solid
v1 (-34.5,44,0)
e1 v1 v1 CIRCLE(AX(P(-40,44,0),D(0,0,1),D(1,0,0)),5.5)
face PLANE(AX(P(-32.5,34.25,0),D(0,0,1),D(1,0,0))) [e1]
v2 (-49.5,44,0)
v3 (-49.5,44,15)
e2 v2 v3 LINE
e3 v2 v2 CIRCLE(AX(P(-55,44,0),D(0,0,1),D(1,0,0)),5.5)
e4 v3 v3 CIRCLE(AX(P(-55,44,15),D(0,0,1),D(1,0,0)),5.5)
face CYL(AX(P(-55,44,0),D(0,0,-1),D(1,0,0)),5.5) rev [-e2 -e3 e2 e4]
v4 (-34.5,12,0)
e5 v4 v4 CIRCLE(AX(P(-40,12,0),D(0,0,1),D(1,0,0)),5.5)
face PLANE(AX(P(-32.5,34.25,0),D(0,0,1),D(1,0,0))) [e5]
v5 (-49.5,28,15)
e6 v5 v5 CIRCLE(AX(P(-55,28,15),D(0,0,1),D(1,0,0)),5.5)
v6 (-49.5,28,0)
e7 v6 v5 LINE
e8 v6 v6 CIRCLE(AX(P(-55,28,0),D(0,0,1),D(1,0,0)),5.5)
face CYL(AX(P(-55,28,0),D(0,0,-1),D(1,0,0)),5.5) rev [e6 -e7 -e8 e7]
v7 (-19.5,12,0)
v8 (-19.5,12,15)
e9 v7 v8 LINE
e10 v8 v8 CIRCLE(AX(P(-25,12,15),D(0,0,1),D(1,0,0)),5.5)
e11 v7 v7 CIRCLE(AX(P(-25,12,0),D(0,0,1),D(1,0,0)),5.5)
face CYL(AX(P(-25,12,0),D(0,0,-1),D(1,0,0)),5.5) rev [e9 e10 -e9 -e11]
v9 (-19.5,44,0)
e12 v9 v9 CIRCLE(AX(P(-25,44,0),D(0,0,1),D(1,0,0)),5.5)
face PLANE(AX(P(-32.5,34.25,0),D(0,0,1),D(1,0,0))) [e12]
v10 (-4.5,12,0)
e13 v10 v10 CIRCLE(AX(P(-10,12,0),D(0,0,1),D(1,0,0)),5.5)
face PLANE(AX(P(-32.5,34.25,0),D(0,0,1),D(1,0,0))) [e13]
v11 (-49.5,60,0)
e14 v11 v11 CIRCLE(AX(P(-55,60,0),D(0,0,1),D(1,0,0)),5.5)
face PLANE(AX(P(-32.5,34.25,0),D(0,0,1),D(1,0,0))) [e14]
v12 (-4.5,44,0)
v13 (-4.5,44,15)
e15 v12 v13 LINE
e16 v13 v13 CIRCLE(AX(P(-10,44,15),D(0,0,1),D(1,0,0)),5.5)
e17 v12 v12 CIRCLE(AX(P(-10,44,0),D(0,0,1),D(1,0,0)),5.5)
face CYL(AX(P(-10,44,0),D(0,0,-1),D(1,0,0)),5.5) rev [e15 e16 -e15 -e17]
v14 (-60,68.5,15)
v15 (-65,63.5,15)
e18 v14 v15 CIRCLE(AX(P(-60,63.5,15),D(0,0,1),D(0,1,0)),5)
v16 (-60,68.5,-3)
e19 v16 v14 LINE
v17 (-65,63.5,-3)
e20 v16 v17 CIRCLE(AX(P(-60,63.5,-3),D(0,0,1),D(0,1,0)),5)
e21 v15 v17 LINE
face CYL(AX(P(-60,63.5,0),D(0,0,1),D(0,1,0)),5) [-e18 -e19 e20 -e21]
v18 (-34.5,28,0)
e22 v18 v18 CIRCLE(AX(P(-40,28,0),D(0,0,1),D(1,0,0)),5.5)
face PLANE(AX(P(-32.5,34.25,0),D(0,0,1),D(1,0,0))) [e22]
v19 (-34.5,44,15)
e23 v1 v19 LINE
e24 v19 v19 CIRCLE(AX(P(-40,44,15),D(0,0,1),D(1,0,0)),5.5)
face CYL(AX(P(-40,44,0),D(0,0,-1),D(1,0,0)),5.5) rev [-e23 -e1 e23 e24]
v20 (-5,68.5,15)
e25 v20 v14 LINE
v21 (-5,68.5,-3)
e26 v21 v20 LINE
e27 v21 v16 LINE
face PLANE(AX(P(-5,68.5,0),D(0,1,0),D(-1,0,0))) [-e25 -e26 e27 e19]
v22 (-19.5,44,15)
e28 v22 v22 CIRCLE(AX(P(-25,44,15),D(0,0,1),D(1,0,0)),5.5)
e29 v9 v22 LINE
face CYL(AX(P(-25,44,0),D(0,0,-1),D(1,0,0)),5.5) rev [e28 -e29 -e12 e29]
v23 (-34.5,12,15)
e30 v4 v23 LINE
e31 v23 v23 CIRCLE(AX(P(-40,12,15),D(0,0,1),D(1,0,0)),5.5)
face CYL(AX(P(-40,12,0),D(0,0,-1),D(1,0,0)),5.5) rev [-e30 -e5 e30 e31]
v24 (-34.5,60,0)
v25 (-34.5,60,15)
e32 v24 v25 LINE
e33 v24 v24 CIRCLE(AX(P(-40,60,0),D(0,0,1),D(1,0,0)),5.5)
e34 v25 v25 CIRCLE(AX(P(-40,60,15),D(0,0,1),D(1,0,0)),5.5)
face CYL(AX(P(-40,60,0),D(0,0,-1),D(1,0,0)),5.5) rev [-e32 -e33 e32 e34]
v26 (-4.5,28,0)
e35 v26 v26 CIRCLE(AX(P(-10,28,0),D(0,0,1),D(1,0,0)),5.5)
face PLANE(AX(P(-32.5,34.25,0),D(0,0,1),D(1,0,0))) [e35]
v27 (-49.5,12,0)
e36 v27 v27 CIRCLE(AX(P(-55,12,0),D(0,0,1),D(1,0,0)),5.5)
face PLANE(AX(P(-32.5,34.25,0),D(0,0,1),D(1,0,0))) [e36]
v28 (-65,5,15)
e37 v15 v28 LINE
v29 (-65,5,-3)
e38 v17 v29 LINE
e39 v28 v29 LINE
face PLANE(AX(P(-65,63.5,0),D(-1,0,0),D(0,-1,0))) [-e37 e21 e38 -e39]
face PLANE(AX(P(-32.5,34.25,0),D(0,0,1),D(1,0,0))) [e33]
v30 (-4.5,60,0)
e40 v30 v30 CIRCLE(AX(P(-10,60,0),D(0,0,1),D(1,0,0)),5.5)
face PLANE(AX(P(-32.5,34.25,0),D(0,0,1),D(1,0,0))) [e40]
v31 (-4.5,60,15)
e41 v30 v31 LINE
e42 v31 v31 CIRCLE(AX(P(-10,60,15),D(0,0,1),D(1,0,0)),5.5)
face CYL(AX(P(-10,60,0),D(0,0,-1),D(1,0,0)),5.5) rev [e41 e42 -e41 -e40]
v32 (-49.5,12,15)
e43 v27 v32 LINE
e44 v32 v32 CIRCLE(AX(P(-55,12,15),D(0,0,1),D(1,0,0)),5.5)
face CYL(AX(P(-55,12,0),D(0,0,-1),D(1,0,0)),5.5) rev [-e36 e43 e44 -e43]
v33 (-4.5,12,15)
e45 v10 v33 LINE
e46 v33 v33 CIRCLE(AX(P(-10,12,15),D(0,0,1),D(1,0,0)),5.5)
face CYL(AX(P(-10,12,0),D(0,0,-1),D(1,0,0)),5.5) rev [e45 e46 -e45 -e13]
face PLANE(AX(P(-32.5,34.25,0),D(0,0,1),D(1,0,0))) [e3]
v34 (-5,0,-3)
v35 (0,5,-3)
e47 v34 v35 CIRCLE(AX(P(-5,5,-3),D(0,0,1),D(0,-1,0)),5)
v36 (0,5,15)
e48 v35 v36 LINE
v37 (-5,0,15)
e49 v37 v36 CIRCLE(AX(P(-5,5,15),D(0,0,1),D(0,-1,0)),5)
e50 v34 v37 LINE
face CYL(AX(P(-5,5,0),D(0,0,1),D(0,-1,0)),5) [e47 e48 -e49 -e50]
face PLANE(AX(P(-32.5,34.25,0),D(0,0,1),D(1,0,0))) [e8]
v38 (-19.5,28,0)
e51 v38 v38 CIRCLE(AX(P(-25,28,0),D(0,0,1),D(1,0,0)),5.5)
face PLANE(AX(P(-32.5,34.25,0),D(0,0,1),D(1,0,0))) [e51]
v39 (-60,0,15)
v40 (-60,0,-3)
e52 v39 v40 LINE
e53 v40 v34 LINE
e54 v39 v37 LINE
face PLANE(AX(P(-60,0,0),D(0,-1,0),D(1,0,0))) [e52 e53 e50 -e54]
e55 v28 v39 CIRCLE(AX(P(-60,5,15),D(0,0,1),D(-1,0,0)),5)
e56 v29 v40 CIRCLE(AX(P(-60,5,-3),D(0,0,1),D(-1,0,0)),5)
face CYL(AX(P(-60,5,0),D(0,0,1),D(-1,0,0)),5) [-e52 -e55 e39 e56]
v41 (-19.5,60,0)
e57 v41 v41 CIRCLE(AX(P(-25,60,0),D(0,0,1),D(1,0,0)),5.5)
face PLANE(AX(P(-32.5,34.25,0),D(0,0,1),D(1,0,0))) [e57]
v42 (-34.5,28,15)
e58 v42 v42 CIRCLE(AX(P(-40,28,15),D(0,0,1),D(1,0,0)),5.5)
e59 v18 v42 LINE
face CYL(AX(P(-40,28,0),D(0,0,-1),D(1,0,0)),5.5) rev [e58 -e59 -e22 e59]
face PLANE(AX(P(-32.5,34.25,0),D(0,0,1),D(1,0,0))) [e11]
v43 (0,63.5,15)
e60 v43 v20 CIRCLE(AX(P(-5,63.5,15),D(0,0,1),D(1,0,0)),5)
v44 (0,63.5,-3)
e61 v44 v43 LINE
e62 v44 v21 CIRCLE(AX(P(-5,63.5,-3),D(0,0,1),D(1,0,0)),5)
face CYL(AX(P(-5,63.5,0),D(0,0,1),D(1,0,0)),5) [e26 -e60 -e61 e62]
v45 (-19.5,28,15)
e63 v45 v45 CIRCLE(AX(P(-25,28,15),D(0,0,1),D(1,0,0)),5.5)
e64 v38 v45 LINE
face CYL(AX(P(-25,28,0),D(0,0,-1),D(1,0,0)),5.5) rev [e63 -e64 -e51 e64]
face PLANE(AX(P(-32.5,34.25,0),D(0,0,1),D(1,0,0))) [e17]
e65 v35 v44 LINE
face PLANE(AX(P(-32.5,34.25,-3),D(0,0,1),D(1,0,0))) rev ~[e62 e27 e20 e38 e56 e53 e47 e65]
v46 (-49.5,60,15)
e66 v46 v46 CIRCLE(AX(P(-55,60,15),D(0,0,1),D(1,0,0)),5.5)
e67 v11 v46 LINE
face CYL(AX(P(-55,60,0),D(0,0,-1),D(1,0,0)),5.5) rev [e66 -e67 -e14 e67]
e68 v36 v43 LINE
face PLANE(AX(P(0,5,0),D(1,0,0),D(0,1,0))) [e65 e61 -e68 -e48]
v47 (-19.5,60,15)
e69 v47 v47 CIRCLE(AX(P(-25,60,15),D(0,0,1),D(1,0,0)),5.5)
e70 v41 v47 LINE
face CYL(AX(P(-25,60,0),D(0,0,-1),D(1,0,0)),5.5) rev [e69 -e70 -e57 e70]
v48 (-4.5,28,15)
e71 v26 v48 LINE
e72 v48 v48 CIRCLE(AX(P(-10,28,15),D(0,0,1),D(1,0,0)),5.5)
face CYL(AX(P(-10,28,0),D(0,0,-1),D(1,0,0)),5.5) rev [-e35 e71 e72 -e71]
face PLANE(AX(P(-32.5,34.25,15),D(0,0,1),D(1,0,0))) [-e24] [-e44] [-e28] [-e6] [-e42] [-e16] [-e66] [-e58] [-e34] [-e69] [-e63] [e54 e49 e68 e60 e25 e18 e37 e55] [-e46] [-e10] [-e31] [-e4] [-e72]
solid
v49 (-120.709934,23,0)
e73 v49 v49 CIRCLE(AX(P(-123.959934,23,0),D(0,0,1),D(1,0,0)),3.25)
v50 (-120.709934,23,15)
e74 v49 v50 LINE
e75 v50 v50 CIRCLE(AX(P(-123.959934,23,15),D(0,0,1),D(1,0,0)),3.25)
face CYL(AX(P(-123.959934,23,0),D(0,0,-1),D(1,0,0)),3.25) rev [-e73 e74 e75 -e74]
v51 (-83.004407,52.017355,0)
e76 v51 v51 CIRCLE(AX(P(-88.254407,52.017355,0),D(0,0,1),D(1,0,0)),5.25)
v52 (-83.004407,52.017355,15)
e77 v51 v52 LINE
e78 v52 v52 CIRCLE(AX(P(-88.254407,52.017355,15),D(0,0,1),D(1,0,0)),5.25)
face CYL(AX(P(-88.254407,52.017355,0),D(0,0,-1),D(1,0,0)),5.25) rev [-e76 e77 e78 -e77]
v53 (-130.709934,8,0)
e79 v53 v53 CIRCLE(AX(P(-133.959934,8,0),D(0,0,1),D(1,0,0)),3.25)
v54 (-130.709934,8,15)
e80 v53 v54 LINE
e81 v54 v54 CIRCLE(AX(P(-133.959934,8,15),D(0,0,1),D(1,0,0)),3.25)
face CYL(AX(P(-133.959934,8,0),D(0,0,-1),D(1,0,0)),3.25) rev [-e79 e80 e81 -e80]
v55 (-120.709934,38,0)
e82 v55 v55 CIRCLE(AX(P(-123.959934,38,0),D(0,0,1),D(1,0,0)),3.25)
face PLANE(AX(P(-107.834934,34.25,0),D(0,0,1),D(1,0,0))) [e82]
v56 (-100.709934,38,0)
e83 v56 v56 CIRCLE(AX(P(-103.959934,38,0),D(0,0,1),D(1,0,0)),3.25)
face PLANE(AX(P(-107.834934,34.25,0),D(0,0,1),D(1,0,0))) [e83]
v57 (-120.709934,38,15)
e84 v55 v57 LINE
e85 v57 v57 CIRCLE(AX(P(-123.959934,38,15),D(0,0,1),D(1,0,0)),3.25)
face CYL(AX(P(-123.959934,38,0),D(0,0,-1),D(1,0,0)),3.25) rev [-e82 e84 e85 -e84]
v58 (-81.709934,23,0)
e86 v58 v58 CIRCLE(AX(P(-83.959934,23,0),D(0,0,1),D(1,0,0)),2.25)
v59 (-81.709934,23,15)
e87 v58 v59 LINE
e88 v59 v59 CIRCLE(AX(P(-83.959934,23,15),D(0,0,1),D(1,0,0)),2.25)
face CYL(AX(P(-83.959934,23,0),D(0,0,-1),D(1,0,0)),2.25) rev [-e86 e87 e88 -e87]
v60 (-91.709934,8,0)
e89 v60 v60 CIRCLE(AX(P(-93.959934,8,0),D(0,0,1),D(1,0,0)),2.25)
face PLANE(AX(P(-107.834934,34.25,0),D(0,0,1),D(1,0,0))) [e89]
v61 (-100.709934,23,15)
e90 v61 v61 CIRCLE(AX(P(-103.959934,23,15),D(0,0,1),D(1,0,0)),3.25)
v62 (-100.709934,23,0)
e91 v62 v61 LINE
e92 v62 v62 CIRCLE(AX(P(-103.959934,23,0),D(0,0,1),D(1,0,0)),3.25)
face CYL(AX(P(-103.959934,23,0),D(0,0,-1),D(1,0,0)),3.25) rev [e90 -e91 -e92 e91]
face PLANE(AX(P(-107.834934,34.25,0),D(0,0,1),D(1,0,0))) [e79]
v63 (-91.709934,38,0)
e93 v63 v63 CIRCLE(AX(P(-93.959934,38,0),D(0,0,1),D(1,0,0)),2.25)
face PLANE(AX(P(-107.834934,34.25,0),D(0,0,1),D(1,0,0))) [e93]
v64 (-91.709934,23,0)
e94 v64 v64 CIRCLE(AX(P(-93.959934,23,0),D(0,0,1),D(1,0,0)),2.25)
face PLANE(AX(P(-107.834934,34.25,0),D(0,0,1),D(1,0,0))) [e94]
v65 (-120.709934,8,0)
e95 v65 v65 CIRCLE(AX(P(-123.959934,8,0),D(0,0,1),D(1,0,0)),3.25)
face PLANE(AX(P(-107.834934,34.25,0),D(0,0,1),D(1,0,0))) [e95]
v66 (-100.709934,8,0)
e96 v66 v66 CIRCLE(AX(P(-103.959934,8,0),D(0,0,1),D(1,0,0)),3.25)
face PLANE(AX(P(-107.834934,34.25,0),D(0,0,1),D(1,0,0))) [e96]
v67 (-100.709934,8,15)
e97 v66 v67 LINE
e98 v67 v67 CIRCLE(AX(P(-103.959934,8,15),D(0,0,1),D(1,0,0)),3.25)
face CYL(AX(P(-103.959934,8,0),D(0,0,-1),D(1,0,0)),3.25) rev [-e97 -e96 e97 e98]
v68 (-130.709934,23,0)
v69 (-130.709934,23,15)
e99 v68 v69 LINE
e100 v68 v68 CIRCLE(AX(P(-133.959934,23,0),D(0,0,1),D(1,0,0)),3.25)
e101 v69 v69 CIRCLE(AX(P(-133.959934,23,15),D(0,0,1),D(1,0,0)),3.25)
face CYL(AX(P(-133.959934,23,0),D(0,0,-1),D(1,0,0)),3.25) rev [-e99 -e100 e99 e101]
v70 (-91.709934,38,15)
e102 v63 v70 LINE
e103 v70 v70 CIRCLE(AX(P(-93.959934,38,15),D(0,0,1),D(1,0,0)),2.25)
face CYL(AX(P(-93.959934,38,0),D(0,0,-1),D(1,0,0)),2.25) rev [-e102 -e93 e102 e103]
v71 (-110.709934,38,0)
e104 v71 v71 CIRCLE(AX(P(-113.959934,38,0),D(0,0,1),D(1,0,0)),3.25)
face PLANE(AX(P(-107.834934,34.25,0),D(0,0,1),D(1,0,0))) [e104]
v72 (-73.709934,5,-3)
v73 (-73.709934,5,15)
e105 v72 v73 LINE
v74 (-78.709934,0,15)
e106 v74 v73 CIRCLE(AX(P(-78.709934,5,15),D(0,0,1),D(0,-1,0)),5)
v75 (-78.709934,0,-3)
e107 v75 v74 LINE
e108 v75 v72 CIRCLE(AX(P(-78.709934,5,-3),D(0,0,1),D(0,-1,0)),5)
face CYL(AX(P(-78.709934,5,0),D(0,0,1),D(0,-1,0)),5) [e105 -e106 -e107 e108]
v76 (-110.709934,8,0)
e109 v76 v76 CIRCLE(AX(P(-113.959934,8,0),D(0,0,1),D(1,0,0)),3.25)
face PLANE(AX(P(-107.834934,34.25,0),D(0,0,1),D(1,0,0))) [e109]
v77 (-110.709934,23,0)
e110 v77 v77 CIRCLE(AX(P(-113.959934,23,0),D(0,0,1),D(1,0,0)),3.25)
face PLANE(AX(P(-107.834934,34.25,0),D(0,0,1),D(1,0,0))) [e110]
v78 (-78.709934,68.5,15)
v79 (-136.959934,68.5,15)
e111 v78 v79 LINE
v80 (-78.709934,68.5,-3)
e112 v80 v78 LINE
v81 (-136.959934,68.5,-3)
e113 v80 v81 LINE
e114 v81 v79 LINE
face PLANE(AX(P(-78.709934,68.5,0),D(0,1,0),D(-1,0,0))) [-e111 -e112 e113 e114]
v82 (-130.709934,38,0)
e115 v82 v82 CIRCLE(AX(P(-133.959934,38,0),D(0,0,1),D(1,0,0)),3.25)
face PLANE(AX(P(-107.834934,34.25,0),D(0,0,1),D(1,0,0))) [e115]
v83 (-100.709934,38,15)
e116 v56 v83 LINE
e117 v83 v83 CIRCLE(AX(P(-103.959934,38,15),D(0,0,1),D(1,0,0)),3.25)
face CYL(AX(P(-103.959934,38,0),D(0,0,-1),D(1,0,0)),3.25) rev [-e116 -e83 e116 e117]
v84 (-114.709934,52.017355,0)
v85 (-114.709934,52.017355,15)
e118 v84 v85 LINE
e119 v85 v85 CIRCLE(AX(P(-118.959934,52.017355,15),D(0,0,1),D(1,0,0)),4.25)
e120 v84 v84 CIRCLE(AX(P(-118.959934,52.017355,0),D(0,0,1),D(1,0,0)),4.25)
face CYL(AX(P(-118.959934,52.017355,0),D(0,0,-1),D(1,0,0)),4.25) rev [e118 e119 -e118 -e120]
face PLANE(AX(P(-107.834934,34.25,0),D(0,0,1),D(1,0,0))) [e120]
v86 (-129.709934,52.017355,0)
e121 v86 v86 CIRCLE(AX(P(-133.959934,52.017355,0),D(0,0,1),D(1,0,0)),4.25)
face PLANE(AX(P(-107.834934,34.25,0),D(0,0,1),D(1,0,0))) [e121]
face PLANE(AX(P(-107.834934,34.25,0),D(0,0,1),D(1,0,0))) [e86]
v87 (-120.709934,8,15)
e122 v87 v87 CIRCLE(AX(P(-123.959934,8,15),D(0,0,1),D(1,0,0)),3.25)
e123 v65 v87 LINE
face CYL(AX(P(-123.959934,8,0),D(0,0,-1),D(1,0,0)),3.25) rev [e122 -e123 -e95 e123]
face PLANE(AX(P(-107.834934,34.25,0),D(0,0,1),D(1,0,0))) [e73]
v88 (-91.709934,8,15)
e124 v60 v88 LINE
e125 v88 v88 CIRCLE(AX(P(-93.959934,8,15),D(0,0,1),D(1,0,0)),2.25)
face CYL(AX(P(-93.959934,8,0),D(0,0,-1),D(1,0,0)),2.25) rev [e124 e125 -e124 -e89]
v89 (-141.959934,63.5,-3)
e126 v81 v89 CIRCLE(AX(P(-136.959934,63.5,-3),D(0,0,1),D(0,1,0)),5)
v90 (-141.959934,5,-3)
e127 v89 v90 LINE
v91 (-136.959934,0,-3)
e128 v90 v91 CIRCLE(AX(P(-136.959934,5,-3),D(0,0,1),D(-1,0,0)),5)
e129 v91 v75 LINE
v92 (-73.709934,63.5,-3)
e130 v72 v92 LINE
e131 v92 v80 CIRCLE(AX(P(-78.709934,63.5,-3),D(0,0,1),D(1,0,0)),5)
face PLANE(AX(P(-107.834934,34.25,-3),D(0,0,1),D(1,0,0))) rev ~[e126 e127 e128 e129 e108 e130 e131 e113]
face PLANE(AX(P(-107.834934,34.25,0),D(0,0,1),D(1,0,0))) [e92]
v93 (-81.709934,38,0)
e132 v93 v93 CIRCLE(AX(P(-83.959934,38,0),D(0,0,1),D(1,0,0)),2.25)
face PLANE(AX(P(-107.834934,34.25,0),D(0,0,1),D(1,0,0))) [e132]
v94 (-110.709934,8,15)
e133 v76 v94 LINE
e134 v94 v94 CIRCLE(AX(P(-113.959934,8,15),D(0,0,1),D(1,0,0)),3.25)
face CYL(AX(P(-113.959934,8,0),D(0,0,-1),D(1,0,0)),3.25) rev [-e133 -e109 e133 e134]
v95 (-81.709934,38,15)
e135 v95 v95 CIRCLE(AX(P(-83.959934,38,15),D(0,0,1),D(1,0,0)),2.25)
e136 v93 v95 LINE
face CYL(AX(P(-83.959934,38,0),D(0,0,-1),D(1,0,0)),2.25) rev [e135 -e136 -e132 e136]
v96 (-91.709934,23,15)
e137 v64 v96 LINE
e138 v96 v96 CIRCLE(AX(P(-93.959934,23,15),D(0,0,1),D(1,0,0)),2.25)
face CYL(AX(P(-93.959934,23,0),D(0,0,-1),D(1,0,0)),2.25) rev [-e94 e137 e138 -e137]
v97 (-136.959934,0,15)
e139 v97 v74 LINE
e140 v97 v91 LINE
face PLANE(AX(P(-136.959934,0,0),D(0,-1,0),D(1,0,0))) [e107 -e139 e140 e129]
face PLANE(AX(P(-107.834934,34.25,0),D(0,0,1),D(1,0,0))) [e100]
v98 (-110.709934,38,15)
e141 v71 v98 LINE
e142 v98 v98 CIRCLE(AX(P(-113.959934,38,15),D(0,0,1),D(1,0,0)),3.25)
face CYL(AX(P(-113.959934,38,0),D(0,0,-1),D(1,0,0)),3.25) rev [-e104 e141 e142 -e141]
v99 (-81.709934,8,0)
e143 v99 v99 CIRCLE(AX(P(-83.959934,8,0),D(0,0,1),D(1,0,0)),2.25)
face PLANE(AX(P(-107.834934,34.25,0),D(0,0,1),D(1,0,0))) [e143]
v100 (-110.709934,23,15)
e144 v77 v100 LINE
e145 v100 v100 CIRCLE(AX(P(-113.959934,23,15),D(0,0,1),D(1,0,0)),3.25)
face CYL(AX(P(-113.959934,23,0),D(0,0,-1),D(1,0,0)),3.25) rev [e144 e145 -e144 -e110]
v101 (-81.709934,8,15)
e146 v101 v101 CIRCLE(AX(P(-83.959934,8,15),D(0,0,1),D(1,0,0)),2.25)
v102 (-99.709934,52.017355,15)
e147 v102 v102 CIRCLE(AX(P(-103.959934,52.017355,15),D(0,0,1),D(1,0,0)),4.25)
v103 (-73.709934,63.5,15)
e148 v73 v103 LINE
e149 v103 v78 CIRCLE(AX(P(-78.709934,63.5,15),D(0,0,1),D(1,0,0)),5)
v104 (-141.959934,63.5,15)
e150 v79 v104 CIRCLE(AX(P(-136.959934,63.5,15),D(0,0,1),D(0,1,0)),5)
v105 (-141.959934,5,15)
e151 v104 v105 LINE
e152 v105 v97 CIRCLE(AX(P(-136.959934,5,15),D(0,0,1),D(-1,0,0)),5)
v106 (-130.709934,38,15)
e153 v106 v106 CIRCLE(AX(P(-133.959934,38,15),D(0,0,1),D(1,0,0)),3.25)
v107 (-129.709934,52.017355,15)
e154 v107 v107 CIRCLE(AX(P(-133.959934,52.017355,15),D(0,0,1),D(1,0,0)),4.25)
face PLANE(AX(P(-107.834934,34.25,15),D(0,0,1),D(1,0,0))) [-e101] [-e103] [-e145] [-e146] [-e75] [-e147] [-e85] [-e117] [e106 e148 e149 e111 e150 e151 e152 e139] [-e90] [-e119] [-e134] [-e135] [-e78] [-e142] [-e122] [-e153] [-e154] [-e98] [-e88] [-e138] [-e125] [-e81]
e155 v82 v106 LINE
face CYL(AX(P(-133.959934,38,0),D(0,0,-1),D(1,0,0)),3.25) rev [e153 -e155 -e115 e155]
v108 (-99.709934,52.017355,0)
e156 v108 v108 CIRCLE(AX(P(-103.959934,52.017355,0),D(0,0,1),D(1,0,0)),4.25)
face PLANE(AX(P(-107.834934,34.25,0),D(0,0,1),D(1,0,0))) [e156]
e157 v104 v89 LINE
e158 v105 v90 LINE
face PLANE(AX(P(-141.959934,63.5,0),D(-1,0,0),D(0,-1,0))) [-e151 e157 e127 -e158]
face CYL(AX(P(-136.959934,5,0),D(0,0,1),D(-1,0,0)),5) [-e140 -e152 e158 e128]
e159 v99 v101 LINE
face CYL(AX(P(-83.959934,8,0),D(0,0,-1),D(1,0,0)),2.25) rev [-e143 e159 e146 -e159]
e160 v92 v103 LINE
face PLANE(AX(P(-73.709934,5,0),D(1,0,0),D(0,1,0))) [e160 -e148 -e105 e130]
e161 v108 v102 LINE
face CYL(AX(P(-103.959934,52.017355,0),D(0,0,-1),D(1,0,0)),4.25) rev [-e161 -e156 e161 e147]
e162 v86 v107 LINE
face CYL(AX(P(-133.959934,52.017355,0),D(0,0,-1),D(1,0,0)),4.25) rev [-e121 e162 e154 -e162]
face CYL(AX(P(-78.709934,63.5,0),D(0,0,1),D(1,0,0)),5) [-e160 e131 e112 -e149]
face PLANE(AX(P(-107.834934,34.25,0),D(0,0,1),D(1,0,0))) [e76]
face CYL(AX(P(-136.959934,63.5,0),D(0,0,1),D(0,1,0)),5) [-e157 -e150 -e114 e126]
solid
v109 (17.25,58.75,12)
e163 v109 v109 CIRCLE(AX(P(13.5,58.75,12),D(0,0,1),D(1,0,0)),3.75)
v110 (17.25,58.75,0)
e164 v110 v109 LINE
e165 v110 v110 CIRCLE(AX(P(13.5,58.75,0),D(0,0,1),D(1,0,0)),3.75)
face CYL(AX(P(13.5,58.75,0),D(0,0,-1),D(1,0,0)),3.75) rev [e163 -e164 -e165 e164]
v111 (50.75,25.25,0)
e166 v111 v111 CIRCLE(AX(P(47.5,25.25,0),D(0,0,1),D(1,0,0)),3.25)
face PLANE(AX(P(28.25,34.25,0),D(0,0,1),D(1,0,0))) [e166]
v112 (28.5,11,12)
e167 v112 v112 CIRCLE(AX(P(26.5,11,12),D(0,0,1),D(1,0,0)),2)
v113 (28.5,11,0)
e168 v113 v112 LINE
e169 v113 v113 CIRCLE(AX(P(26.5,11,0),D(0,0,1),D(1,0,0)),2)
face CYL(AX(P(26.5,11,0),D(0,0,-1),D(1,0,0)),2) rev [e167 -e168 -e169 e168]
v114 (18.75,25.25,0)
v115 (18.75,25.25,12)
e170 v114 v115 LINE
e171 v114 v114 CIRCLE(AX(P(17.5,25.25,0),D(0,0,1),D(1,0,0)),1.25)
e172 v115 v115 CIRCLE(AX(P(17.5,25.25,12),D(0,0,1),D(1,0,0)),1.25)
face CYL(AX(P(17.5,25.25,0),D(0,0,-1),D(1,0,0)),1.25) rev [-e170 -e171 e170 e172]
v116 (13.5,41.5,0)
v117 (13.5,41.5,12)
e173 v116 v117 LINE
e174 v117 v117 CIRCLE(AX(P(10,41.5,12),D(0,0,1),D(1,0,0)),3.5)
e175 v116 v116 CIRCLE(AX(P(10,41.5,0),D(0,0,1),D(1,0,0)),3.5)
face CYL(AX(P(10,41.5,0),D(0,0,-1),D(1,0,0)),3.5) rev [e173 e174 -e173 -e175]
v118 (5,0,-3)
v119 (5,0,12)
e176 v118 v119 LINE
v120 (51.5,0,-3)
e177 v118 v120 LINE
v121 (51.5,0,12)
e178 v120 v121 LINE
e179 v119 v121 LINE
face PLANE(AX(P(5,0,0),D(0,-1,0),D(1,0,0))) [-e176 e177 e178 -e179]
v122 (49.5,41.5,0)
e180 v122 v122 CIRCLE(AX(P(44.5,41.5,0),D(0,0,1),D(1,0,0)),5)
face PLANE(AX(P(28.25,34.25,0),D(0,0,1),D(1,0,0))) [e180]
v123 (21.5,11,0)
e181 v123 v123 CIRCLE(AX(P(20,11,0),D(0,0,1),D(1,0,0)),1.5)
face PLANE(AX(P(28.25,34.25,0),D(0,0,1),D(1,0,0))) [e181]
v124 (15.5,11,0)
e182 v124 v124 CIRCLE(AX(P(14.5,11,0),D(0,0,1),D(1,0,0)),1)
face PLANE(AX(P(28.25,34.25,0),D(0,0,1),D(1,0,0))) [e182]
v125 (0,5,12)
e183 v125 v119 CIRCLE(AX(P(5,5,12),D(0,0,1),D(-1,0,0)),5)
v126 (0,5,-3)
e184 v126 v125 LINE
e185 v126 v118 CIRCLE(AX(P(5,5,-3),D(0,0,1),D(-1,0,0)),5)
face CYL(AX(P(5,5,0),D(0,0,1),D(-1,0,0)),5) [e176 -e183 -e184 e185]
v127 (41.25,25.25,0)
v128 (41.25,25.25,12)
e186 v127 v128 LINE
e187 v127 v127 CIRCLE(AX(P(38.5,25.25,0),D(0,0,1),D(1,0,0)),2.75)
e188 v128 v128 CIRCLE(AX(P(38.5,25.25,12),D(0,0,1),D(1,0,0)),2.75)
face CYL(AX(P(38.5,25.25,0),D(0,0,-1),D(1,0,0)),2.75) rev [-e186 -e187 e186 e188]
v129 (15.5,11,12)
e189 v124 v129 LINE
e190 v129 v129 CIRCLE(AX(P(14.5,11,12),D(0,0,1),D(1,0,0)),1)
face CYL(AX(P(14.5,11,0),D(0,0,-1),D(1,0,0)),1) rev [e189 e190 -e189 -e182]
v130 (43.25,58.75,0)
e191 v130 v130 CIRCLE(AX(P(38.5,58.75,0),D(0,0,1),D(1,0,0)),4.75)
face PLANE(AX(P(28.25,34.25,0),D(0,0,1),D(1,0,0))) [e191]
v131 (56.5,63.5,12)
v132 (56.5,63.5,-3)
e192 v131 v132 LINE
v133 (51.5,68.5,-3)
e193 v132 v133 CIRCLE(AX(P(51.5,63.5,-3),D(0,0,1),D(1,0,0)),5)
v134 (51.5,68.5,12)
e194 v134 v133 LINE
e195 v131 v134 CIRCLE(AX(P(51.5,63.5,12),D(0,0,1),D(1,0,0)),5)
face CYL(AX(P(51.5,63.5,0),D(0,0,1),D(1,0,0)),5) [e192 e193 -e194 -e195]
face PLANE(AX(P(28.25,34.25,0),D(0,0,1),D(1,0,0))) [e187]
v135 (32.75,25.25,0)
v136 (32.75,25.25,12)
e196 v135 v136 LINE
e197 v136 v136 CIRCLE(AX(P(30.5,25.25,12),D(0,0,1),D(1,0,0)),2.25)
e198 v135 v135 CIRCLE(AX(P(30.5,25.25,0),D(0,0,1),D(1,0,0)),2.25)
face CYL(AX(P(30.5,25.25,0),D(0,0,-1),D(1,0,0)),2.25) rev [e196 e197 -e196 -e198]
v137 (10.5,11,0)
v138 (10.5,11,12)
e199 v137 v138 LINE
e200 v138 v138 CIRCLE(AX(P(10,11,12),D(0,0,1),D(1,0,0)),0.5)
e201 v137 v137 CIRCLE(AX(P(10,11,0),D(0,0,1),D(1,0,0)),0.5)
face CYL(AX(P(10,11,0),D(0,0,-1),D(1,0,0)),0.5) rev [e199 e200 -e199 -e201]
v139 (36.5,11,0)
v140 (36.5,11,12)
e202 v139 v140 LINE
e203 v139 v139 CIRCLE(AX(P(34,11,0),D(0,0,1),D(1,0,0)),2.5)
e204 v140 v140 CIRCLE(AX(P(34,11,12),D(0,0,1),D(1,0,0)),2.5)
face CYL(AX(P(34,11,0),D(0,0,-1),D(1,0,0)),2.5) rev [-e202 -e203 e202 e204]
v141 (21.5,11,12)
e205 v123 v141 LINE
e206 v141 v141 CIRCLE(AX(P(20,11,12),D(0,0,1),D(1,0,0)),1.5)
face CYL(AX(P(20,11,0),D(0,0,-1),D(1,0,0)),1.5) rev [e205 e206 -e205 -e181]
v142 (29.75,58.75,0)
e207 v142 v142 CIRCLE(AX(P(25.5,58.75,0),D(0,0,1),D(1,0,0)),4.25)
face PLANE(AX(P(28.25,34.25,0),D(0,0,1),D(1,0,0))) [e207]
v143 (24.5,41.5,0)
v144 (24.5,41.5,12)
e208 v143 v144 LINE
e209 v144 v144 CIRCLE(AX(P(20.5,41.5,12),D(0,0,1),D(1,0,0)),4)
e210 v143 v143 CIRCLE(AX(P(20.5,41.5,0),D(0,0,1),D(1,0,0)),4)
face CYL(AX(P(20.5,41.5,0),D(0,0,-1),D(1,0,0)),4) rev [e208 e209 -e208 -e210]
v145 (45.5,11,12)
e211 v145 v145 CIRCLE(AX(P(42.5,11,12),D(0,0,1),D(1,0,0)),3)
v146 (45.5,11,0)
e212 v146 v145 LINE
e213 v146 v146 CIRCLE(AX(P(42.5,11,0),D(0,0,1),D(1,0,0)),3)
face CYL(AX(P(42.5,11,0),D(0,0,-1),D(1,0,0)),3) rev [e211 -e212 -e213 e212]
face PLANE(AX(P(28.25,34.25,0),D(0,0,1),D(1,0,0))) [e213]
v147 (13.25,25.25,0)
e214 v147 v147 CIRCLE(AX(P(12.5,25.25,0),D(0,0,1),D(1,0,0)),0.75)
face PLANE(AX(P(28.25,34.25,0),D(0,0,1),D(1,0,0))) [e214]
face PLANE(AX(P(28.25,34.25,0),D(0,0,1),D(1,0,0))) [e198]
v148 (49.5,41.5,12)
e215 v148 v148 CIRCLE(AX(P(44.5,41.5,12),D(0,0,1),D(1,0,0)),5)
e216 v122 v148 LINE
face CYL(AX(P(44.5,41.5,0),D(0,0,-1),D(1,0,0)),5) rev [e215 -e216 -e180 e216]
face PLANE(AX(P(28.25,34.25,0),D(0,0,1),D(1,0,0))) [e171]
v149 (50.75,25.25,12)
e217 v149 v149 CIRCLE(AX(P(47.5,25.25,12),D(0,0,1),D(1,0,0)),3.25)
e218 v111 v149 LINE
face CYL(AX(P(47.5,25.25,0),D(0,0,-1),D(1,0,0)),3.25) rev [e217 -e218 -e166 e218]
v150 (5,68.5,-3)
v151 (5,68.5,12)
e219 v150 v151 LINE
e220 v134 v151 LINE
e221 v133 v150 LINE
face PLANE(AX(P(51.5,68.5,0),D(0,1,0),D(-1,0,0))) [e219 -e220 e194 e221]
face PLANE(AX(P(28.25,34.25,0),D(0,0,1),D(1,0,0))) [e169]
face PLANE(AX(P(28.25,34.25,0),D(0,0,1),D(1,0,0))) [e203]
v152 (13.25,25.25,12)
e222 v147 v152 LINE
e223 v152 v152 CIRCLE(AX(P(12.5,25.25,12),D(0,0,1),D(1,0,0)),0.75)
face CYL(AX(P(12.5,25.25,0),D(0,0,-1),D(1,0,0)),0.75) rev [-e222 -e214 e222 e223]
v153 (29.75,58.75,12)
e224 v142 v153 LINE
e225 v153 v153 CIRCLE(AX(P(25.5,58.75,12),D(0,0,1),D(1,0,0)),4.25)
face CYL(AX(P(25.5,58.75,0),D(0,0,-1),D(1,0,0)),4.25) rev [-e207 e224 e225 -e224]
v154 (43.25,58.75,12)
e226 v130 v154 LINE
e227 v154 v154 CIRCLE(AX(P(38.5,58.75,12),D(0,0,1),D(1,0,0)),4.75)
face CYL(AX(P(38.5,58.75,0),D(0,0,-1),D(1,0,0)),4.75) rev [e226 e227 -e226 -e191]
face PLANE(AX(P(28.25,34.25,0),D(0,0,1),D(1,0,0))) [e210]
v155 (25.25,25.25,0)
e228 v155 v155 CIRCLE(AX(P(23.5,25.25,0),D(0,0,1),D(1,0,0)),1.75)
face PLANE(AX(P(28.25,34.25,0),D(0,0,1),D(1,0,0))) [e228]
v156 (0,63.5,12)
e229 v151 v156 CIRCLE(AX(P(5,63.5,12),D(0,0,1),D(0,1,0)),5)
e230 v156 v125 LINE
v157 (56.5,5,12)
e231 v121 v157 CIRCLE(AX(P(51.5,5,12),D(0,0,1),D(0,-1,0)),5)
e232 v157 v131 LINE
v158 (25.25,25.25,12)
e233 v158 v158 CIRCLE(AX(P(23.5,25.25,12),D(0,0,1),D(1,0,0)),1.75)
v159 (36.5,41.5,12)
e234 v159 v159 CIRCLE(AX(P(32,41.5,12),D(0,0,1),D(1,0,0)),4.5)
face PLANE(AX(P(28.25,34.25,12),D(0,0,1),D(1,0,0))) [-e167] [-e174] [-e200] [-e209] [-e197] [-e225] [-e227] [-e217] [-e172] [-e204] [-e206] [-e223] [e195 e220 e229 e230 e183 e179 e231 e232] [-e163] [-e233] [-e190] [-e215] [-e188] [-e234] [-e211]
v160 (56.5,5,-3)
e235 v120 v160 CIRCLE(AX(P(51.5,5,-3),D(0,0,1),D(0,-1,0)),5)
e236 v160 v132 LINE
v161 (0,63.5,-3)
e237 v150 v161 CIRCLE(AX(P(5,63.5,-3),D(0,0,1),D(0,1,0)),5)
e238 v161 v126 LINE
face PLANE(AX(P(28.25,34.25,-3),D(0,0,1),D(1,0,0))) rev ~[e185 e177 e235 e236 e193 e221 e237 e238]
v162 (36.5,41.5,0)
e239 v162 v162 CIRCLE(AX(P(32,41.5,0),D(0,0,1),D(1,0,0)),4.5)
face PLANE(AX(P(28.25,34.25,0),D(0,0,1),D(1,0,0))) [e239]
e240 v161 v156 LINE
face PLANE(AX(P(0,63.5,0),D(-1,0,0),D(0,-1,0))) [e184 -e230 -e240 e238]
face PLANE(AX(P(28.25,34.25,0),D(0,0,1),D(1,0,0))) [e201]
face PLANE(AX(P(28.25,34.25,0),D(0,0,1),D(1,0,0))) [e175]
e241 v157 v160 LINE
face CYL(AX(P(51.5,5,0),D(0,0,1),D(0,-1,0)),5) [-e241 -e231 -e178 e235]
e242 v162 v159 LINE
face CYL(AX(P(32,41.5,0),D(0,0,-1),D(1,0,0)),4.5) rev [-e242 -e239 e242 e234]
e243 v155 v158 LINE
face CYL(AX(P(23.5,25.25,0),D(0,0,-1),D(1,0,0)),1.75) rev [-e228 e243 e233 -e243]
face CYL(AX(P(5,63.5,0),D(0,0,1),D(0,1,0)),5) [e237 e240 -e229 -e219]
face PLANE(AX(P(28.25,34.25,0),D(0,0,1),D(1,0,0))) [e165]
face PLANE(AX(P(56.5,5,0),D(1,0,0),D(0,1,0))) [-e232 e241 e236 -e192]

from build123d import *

# Parameters (mm, degrees)
F0_R     = 0.5
F0_R_2   = 1
F0_R_3   = 1.5
F0_R_4   = 2
F0_R_5   = 0.75
F0_R_6   = 1.25
F0_R_7   = 1.75
F0_R_8   = 2.5
F0_R_9   = 3
F0_R_10  = 2.25
F0_R_11  = 2.75
F0_R_12  = 3.25
F0_R_13  = 3.5
F0_R_14  = 4
F0_R_15  = 3.75
F0_R_16  = 4.25
F0_R_17  = 4.5
F0_R_18  = 5
F0_R_19  = 4.75
F1_DEPTH = 12
F2_DEPTH = 3
F3_R     = 5.5
F4_DEPTH = 15
F5_DEPTH = 3
F6_R     = 3.25
F6_R_2   = 2.25
F6_R_3   = 4.25
F6_R_4   = 5.25
F7_DEPTH = 15
F8_DEPTH = 3


with BuildPart() as f1:
    # F0 (on Top) → F1 (new body)
    with BuildSketch(Plane.XY):
        with BuildLine():
            Line((51.5, 68.5), (5, 68.5))
            ThreePointArc((5, 68.5), (1.4644660941, 67.0355339059), (0, 63.5))
            Line((0, 63.5), (0, 5))
            ThreePointArc((0, 5), (1.4644660941, 1.4644660941), (5, 0))
            Line((5, 0), (51.5, 0))
            ThreePointArc((51.5, 0), (55.0355339059, 1.4644660941), (56.5, 5))
            Line((56.5, 5), (56.5, 63.5))
            ThreePointArc((56.5, 63.5), (55.0355339059, 67.0355339059), (51.5, 68.5))
        make_face()
        with Locations((10, 11)):
            Circle(F0_R, mode=Mode.SUBTRACT)
        with Locations((14.5, 11)):
            Circle(F0_R_2, mode=Mode.SUBTRACT)
        with Locations((20, 11)):
            Circle(F0_R_3, mode=Mode.SUBTRACT)
        with Locations((26.5, 11)):
            Circle(F0_R_4, mode=Mode.SUBTRACT)
        with Locations((12.5, 25.25)):
            Circle(F0_R_5, mode=Mode.SUBTRACT)
        with Locations((17.5, 25.25)):
            Circle(F0_R_6, mode=Mode.SUBTRACT)
        with Locations((23.5, 25.25)):
            Circle(F0_R_7, mode=Mode.SUBTRACT)
        with Locations((34, 11)):
            Circle(F0_R_8, mode=Mode.SUBTRACT)
        with Locations((42.5, 11)):
            Circle(F0_R_9, mode=Mode.SUBTRACT)
        with Locations((30.5, 25.25)):
            Circle(F0_R_10, mode=Mode.SUBTRACT)
        with Locations((38.5, 25.25)):
            Circle(F0_R_11, mode=Mode.SUBTRACT)
        with Locations((47.5, 25.25)):
            Circle(F0_R_12, mode=Mode.SUBTRACT)
        with Locations((10, 41.5)):
            Circle(F0_R_13, mode=Mode.SUBTRACT)
        with Locations((20.5, 41.5)):
            Circle(F0_R_14, mode=Mode.SUBTRACT)
        with Locations((13.5, 58.75)):
            Circle(F0_R_15, mode=Mode.SUBTRACT)
        with Locations((25.5, 58.75)):
            Circle(F0_R_16, mode=Mode.SUBTRACT)
        with Locations((32, 41.5)):
            Circle(F0_R_17, mode=Mode.SUBTRACT)
        with Locations((44.5, 41.5)):
            Circle(F0_R_18, mode=Mode.SUBTRACT)
        with Locations((38.5, 58.75)):
            Circle(F0_R_19, mode=Mode.SUBTRACT)
    extrude(amount=F1_DEPTH)

    # F0 (on Top) → F2 (join)
    with BuildSketch(Plane.XY):
        with BuildLine():
            Line((51.5, 68.5), (5, 68.5))
            ThreePointArc((5, 68.5), (1.4644660941, 67.0355339059), (0, 63.5))
            Line((0, 63.5), (0, 5))
            ThreePointArc((0, 5), (1.4644660941, 1.4644660941), (5, 0))
            Line((5, 0), (51.5, 0))
            ThreePointArc((51.5, 0), (55.0355339059, 1.4644660941), (56.5, 5))
            Line((56.5, 5), (56.5, 63.5))
            ThreePointArc((56.5, 63.5), (55.0355339059, 67.0355339059), (51.5, 68.5))
        make_face()
        with Locations((10, 11)):
            Circle(F0_R, mode=Mode.SUBTRACT)
        with Locations((14.5, 11)):
            Circle(F0_R_2, mode=Mode.SUBTRACT)
        with Locations((20, 11)):
            Circle(F0_R_3, mode=Mode.SUBTRACT)
        with Locations((26.5, 11)):
            Circle(F0_R_4, mode=Mode.SUBTRACT)
        with Locations((12.5, 25.25)):
            Circle(F0_R_5, mode=Mode.SUBTRACT)
        with Locations((17.5, 25.25)):
            Circle(F0_R_6, mode=Mode.SUBTRACT)
        with Locations((23.5, 25.25)):
            Circle(F0_R_7, mode=Mode.SUBTRACT)
        with Locations((34, 11)):
            Circle(F0_R_8, mode=Mode.SUBTRACT)
        with Locations((42.5, 11)):
            Circle(F0_R_9, mode=Mode.SUBTRACT)
        with Locations((30.5, 25.25)):
            Circle(F0_R_10, mode=Mode.SUBTRACT)
        with Locations((38.5, 25.25)):
            Circle(F0_R_11, mode=Mode.SUBTRACT)
        with Locations((47.5, 25.25)):
            Circle(F0_R_12, mode=Mode.SUBTRACT)
        with Locations((10, 41.5)):
            Circle(F0_R_13, mode=Mode.SUBTRACT)
        with Locations((20.5, 41.5)):
            Circle(F0_R_14, mode=Mode.SUBTRACT)
        with Locations((13.5, 58.75)):
            Circle(F0_R_15, mode=Mode.SUBTRACT)
        with Locations((25.5, 58.75)):
            Circle(F0_R_16, mode=Mode.SUBTRACT)
        with Locations((32, 41.5)):
            Circle(F0_R_17, mode=Mode.SUBTRACT)
        with Locations((44.5, 41.5)):
            Circle(F0_R_18, mode=Mode.SUBTRACT)
        with Locations((38.5, 58.75)):
            Circle(F0_R_19, mode=Mode.SUBTRACT)
        with Locations((44.5, 41.5)):
            Circle(F0_R_18)
        with Locations((38.5, 58.75)):
            Circle(F0_R_19)
        with Locations((32, 41.5)):
            Circle(F0_R_17)
        with Locations((25.5, 58.75)):
            Circle(F0_R_16)
        with Locations((20.5, 41.5)):
            Circle(F0_R_14)
        with Locations((13.5, 58.75)):
            Circle(F0_R_15)
        with Locations((10, 41.5)):
            Circle(F0_R_13)
        with Locations((47.5, 25.25)):
            Circle(F0_R_12)
        with Locations((42.5, 11)):
            Circle(F0_R_9)
        with Locations((38.5, 25.25)):
            Circle(F0_R_11)
        with Locations((34, 11)):
            Circle(F0_R_8)
        with Locations((30.5, 25.25)):
            Circle(F0_R_10)
        with Locations((26.5, 11)):
            Circle(F0_R_4)
        with Locations((23.5, 25.25)):
            Circle(F0_R_7)
        with Locations((20, 11)):
            Circle(F0_R_3)
        with Locations((17.5, 25.25)):
            Circle(F0_R_6)
        with Locations((14.5, 11)):
            Circle(F0_R_2)
        with Locations((12.5, 25.25)):
            Circle(F0_R_5)
        with Locations((10, 11)):
            Circle(F0_R)
    extrude(amount=-F2_DEPTH)


with BuildPart() as f4:
    # F3 (on Top) → F4 (new body)
    with BuildSketch(Plane.XY):
        with BuildLine():
            Line((-60, 0), (-5, 0))
            ThreePointArc((-5, 0), (-1.4644660941, 1.4644660941), (0, 5))
            Line((0, 5), (0, 63.5))
            ThreePointArc((0, 63.5), (-1.4644660941, 67.0355339059), (-5, 68.5))
            Line((-5, 68.5), (-60, 68.5))
            ThreePointArc((-60, 68.5), (-63.5355339059, 67.0355339059), (-65, 63.5))
            Line((-65, 63.5), (-65, 5))
            ThreePointArc((-65, 5), (-63.5355339059, 1.4644660941), (-60, 0))
        make_face()
        with Locations((-55, 12)):
            Circle(F3_R, mode=Mode.SUBTRACT)
        with Locations((-40, 12)):
            Circle(F3_R, mode=Mode.SUBTRACT)
        with Locations((-55, 28)):
            Circle(F3_R, mode=Mode.SUBTRACT)
        with Locations((-40, 28)):
            Circle(F3_R, mode=Mode.SUBTRACT)
        with Locations((-25, 12)):
            Circle(F3_R, mode=Mode.SUBTRACT)
        with Locations((-10, 12)):
            Circle(F3_R, mode=Mode.SUBTRACT)
        with Locations((-25, 28)):
            Circle(F3_R, mode=Mode.SUBTRACT)
        with Locations((-10, 28)):
            Circle(F3_R, mode=Mode.SUBTRACT)
        with Locations((-55, 44)):
            Circle(F3_R, mode=Mode.SUBTRACT)
        with Locations((-40, 44)):
            Circle(F3_R, mode=Mode.SUBTRACT)
        with Locations((-55, 60)):
            Circle(F3_R, mode=Mode.SUBTRACT)
        with Locations((-40, 60)):
            Circle(F3_R, mode=Mode.SUBTRACT)
        with Locations((-25, 44)):
            Circle(F3_R, mode=Mode.SUBTRACT)
        with Locations((-10, 44)):
            Circle(F3_R, mode=Mode.SUBTRACT)
        with Locations((-25, 60)):
            Circle(F3_R, mode=Mode.SUBTRACT)
        with Locations((-10, 60)):
            Circle(F3_R, mode=Mode.SUBTRACT)
    extrude(amount=F4_DEPTH)

    # F3 (on Top) → F5 (join)
    with BuildSketch(Plane.XY):
        with BuildLine():
            Line((-60, 0), (-5, 0))
            ThreePointArc((-5, 0), (-1.4644660941, 1.4644660941), (0, 5))
            Line((0, 5), (0, 63.5))
            ThreePointArc((0, 63.5), (-1.4644660941, 67.0355339059), (-5, 68.5))
            Line((-5, 68.5), (-60, 68.5))
            ThreePointArc((-60, 68.5), (-63.5355339059, 67.0355339059), (-65, 63.5))
            Line((-65, 63.5), (-65, 5))
            ThreePointArc((-65, 5), (-63.5355339059, 1.4644660941), (-60, 0))
        make_face()
        with Locations((-55, 12)):
            Circle(F3_R, mode=Mode.SUBTRACT)
        with Locations((-40, 12)):
            Circle(F3_R, mode=Mode.SUBTRACT)
        with Locations((-55, 28)):
            Circle(F3_R, mode=Mode.SUBTRACT)
        with Locations((-40, 28)):
            Circle(F3_R, mode=Mode.SUBTRACT)
        with Locations((-25, 12)):
            Circle(F3_R, mode=Mode.SUBTRACT)
        with Locations((-10, 12)):
            Circle(F3_R, mode=Mode.SUBTRACT)
        with Locations((-25, 28)):
            Circle(F3_R, mode=Mode.SUBTRACT)
        with Locations((-10, 28)):
            Circle(F3_R, mode=Mode.SUBTRACT)
        with Locations((-55, 44)):
            Circle(F3_R, mode=Mode.SUBTRACT)
        with Locations((-40, 44)):
            Circle(F3_R, mode=Mode.SUBTRACT)
        with Locations((-55, 60)):
            Circle(F3_R, mode=Mode.SUBTRACT)
        with Locations((-40, 60)):
            Circle(F3_R, mode=Mode.SUBTRACT)
        with Locations((-25, 44)):
            Circle(F3_R, mode=Mode.SUBTRACT)
        with Locations((-10, 44)):
            Circle(F3_R, mode=Mode.SUBTRACT)
        with Locations((-25, 60)):
            Circle(F3_R, mode=Mode.SUBTRACT)
        with Locations((-10, 60)):
            Circle(F3_R, mode=Mode.SUBTRACT)
        with Locations((-55, 12)):
            Circle(F3_R)
        with Locations((-55, 28)):
            Circle(F3_R)
        with Locations((-55, 44)):
            Circle(F3_R)
        with Locations((-55, 60)):
            Circle(F3_R)
        with Locations((-40, 60)):
            Circle(F3_R)
        with Locations((-40, 44)):
            Circle(F3_R)
        with Locations((-40, 28)):
            Circle(F3_R)
        with Locations((-40, 12)):
            Circle(F3_R)
        with Locations((-25, 12)):
            Circle(F3_R)
        with Locations((-25, 28)):
            Circle(F3_R)
        with Locations((-25, 44)):
            Circle(F3_R)
        with Locations((-25, 60)):
            Circle(F3_R)
        with Locations((-10, 60)):
            Circle(F3_R)
        with Locations((-10, 44)):
            Circle(F3_R)
        with Locations((-10, 28)):
            Circle(F3_R)
        with Locations((-10, 12)):
            Circle(F3_R)
    extrude(amount=-F5_DEPTH)


with BuildPart() as f7:
    # F6 (on Top) → F7 (new body)
    with BuildSketch(Plane.XY):
        with BuildLine():
            Line((-136.9599341154, 0), (-78.7099341154, 0))
            ThreePointArc((-78.7099341154, 0), (-75.1744002095, 1.4644660941), (-73.7099341154, 5))
            Line((-73.7099341154, 5), (-73.7099341154, 63.5))
            ThreePointArc((-73.7099341154, 63.5), (-75.1744002095, 67.0355339059), (-78.7099341154, 68.5))
            Line((-78.7099341154, 68.5), (-136.9599341154, 68.5))
            ThreePointArc((-136.9599341154, 68.5), (-140.4954680213, 67.0355339059), (-141.9599341154, 63.5))
            Line((-141.9599341154, 63.5), (-141.9599341154, 5))
            ThreePointArc((-141.9599341154, 5), (-140.4954680213, 1.4644660941), (-136.9599341154, 0))
        make_face()
        with Locations((-133.9599341154, 8)):
            Circle(F6_R, mode=Mode.SUBTRACT)
        with Locations((-123.9599341154, 8)):
            Circle(F6_R, mode=Mode.SUBTRACT)
        with Locations((-113.9599341154, 8)):
            Circle(F6_R, mode=Mode.SUBTRACT)
        with Locations((-133.9599341154, 23)):
            Circle(F6_R, mode=Mode.SUBTRACT)
        with Locations((-123.9599341154, 23)):
            Circle(F6_R, mode=Mode.SUBTRACT)
        with Locations((-113.9599341154, 23)):
            Circle(F6_R, mode=Mode.SUBTRACT)
        with Locations((-103.9599341154, 8)):
            Circle(F6_R, mode=Mode.SUBTRACT)
        with Locations((-93.9599341154, 8)):
            Circle(F6_R_2, mode=Mode.SUBTRACT)
        with Locations((-83.9599341154, 8)):
            Circle(F6_R_2, mode=Mode.SUBTRACT)
        with Locations((-103.9599341154, 23)):
            Circle(F6_R, mode=Mode.SUBTRACT)
        with Locations((-93.9599341154, 23)):
            Circle(F6_R_2, mode=Mode.SUBTRACT)
        with Locations((-83.9599341154, 23)):
            Circle(F6_R_2, mode=Mode.SUBTRACT)
        with Locations((-133.9599341154, 38)):
            Circle(F6_R, mode=Mode.SUBTRACT)
        with Locations((-123.9599341154, 38)):
            Circle(F6_R, mode=Mode.SUBTRACT)
        with Locations((-113.9599341154, 38)):
            Circle(F6_R, mode=Mode.SUBTRACT)
        with Locations((-133.9599341154, 52.017354504)):
            Circle(F6_R_3, mode=Mode.SUBTRACT)
        with Locations((-118.9599341154, 52.017354504)):
            Circle(F6_R_3, mode=Mode.SUBTRACT)
        with Locations((-103.9599341154, 38)):
            Circle(F6_R, mode=Mode.SUBTRACT)
        with Locations((-93.9599341154, 38)):
            Circle(F6_R_2, mode=Mode.SUBTRACT)
        with Locations((-83.9599341154, 38)):
            Circle(F6_R_2, mode=Mode.SUBTRACT)
        with Locations((-103.9599341154, 52.017354504)):
            Circle(F6_R_3, mode=Mode.SUBTRACT)
        with Locations((-88.2544073784, 52.017354504)):
            Circle(F6_R_4, mode=Mode.SUBTRACT)
    extrude(amount=F7_DEPTH)

    # F6 (on Top) → F8 (join)
    with BuildSketch(Plane.XY):
        with BuildLine():
            Line((-136.9599341154, 0), (-78.7099341154, 0))
            ThreePointArc((-78.7099341154, 0), (-75.1744002095, 1.4644660941), (-73.7099341154, 5))
            Line((-73.7099341154, 5), (-73.7099341154, 63.5))
            ThreePointArc((-73.7099341154, 63.5), (-75.1744002095, 67.0355339059), (-78.7099341154, 68.5))
            Line((-78.7099341154, 68.5), (-136.9599341154, 68.5))
            ThreePointArc((-136.9599341154, 68.5), (-140.4954680213, 67.0355339059), (-141.9599341154, 63.5))
            Line((-141.9599341154, 63.5), (-141.9599341154, 5))
            ThreePointArc((-141.9599341154, 5), (-140.4954680213, 1.4644660941), (-136.9599341154, 0))
        make_face()
        with Locations((-133.9599341154, 8)):
            Circle(F6_R, mode=Mode.SUBTRACT)
        with Locations((-123.9599341154, 8)):
            Circle(F6_R, mode=Mode.SUBTRACT)
        with Locations((-113.9599341154, 8)):
            Circle(F6_R, mode=Mode.SUBTRACT)
        with Locations((-133.9599341154, 23)):
            Circle(F6_R, mode=Mode.SUBTRACT)
        with Locations((-123.9599341154, 23)):
            Circle(F6_R, mode=Mode.SUBTRACT)
        with Locations((-113.9599341154, 23)):
            Circle(F6_R, mode=Mode.SUBTRACT)
        with Locations((-103.9599341154, 8)):
            Circle(F6_R, mode=Mode.SUBTRACT)
        with Locations((-93.9599341154, 8)):
            Circle(F6_R_2, mode=Mode.SUBTRACT)
        with Locations((-83.9599341154, 8)):
            Circle(F6_R_2, mode=Mode.SUBTRACT)
        with Locations((-103.9599341154, 23)):
            Circle(F6_R, mode=Mode.SUBTRACT)
        with Locations((-93.9599341154, 23)):
            Circle(F6_R_2, mode=Mode.SUBTRACT)
        with Locations((-83.9599341154, 23)):
            Circle(F6_R_2, mode=Mode.SUBTRACT)
        with Locations((-133.9599341154, 38)):
            Circle(F6_R, mode=Mode.SUBTRACT)
        with Locations((-123.9599341154, 38)):
            Circle(F6_R, mode=Mode.SUBTRACT)
        with Locations((-113.9599341154, 38)):
            Circle(F6_R, mode=Mode.SUBTRACT)
        with Locations((-133.9599341154, 52.017354504)):
            Circle(F6_R_3, mode=Mode.SUBTRACT)
        with Locations((-118.9599341154, 52.017354504)):
            Circle(F6_R_3, mode=Mode.SUBTRACT)
        with Locations((-103.9599341154, 38)):
            Circle(F6_R, mode=Mode.SUBTRACT)
        with Locations((-93.9599341154, 38)):
            Circle(F6_R_2, mode=Mode.SUBTRACT)
        with Locations((-83.9599341154, 38)):
            Circle(F6_R_2, mode=Mode.SUBTRACT)
        with Locations((-103.9599341154, 52.017354504)):
            Circle(F6_R_3, mode=Mode.SUBTRACT)
        with Locations((-88.2544073784, 52.017354504)):
            Circle(F6_R_4, mode=Mode.SUBTRACT)
        with Locations((-88.2544073784, 52.017354504)):
            Circle(F6_R_4)
        with Locations((-133.9599341154, 52.017354504)):
            Circle(F6_R_3)
        with Locations((-118.9599341154, 52.017354504)):
            Circle(F6_R_3)
        with Locations((-103.9599341154, 52.017354504)):
            Circle(F6_R_3)
        with Locations((-103.9599341154, 38)):
            Circle(F6_R)
        with Locations((-123.9599341154, 38)):
            Circle(F6_R)
        with Locations((-133.9599341154, 38)):
            Circle(F6_R)
        with Locations((-133.9599341154, 23)):
            Circle(F6_R)
        with Locations((-123.9599341154, 23)):
            Circle(F6_R)
        with Locations((-113.9599341154, 23)):
            Circle(F6_R)
        with Locations((-103.9599341154, 23)):
            Circle(F6_R)
        with Locations((-103.9599341154, 8)):
            Circle(F6_R)
        with Locations((-113.9599341154, 8)):
            Circle(F6_R)
        with Locations((-123.9599341154, 8)):
            Circle(F6_R)
        with Locations((-133.9599341154, 8)):
            Circle(F6_R)
        with Locations((-113.9599341154, 38)):
            Circle(F6_R)
        with Locations((-83.9599341154, 38)):
            Circle(F6_R_2)
        with Locations((-93.9599341154, 38)):
            Circle(F6_R_2)
        with Locations((-93.9599341154, 23)):
            Circle(F6_R_2)
        with Locations((-83.9599341154, 23)):
            Circle(F6_R_2)
        with Locations((-83.9599341154, 8)):
            Circle(F6_R_2)
        with Locations((-93.9599341154, 8)):
            Circle(F6_R_2)
    extrude(amount=-F8_DEPTH)


solid = Compound([f1.part, f4.part, f7.part])
